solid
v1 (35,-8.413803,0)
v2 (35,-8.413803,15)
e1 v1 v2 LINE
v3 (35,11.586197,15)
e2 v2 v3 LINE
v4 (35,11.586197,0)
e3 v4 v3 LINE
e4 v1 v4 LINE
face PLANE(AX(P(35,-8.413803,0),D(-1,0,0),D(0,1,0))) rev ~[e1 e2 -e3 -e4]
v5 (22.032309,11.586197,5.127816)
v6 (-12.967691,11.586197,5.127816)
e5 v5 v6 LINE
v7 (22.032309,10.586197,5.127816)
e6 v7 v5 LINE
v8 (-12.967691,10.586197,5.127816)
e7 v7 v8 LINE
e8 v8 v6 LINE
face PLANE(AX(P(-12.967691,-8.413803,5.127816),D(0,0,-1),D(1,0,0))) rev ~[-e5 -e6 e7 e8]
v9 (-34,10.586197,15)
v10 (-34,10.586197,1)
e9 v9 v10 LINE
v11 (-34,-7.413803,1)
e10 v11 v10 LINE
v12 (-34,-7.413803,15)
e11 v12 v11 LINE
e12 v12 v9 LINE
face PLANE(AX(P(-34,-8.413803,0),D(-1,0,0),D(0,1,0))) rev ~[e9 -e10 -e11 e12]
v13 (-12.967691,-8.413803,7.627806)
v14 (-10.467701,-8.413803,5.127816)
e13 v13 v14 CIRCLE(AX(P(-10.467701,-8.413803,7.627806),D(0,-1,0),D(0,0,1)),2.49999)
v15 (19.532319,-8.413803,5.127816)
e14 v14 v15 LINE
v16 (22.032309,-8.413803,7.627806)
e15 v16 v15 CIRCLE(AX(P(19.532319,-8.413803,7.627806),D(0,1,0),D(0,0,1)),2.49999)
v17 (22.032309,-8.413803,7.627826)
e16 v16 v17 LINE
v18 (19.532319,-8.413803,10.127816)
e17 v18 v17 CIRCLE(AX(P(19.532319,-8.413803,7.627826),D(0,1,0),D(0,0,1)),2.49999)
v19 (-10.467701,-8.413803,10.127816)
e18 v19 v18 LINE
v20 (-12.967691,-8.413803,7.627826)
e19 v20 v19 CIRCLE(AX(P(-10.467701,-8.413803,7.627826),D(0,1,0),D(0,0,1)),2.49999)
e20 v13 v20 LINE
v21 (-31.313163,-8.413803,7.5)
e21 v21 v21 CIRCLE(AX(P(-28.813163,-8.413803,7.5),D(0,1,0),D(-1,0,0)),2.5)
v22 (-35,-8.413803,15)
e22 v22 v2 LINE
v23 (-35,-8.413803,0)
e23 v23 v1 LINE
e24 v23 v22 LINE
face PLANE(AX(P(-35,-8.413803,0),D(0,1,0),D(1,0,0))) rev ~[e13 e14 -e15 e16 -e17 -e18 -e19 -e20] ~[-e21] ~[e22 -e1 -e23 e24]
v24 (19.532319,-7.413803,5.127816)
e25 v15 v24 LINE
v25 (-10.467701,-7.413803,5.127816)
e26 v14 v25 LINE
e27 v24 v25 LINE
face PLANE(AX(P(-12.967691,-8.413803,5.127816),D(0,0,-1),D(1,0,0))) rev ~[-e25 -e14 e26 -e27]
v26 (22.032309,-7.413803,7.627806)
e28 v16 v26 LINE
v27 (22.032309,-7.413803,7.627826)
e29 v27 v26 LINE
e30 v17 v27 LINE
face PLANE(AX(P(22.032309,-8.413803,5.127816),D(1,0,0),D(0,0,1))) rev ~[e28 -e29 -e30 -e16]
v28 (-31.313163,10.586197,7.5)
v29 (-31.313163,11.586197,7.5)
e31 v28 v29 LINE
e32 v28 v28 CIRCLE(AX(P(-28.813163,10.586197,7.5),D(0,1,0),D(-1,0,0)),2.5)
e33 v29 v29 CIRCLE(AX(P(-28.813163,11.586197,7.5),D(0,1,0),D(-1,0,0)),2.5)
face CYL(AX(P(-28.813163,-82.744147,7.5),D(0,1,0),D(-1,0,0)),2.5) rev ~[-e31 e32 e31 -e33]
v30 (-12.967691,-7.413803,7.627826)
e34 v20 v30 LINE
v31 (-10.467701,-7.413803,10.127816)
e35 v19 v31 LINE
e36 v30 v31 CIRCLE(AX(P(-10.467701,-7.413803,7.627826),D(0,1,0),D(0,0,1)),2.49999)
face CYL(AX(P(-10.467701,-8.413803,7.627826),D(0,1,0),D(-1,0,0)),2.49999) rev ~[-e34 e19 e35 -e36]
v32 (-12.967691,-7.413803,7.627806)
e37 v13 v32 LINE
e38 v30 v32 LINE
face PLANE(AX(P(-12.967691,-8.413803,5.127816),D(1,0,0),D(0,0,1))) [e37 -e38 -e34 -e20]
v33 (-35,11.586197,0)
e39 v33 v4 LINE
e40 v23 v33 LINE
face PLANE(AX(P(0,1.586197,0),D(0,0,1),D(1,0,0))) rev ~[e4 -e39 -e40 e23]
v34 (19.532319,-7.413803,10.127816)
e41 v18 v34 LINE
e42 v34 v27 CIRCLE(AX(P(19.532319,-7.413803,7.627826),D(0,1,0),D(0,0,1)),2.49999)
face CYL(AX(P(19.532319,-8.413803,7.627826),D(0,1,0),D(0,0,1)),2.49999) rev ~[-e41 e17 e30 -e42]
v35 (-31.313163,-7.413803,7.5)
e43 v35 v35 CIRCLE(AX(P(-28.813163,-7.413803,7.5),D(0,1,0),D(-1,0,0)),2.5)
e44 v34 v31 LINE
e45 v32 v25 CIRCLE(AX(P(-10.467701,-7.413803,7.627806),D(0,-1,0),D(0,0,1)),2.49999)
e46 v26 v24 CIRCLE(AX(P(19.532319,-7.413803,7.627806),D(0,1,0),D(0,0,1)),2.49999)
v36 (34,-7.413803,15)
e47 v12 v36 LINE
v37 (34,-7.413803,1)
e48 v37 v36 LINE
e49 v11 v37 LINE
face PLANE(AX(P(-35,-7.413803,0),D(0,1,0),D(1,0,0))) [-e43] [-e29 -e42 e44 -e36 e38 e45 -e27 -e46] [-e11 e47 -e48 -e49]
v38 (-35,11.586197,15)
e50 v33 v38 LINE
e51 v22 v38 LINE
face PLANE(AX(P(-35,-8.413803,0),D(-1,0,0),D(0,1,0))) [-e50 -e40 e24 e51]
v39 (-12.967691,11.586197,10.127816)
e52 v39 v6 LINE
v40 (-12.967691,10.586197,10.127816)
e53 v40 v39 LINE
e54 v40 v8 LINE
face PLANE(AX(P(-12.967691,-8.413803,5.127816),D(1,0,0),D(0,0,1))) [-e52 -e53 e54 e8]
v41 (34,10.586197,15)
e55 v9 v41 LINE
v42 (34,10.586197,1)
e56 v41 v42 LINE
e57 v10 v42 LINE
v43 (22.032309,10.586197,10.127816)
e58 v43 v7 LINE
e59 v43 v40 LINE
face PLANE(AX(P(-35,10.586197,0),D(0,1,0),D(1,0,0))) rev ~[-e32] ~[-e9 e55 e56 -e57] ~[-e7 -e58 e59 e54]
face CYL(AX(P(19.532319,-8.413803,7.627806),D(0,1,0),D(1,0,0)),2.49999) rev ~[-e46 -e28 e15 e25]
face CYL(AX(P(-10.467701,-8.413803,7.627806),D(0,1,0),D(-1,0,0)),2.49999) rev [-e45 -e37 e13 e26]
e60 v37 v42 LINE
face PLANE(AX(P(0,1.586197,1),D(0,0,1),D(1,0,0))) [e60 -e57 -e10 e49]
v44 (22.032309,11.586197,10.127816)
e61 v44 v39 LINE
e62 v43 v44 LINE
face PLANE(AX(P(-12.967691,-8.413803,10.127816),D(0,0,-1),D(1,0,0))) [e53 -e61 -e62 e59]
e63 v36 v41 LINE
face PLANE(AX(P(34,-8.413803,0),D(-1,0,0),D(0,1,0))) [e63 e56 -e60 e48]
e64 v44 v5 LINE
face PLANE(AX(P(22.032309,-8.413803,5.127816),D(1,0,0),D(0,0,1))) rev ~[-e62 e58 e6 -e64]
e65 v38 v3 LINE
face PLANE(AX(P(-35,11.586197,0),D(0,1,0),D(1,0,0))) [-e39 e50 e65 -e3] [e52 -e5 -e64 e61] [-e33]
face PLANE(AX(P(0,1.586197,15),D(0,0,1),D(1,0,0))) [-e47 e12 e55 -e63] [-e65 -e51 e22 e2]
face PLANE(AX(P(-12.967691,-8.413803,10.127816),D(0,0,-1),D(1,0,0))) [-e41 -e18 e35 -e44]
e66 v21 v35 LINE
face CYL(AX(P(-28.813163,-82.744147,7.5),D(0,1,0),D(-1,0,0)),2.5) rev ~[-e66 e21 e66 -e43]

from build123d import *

# Parameters (mm, degrees)
F0_W     = 70
F0_H     = 20
F1_DEPTH = 15
F3_T     = -1
F4_D     = 5
F2_W     = 35
F2_H     = 5
F5_DEPTH = 25
F6_R     = 2.49999


# Not quite as in the source:
# - a fillet or chamfer is up to 0.001 mm smaller than in the source, because OpenCascade refuses the exact size


with BuildPart() as f1:
    # F0 (on Top) → F1 (new body)
    with BuildSketch(Plane.XY):
        with Locations((0, 1.5861968277)):
            Rectangle(F0_W, F0_H)
    extrude(amount=F1_DEPTH)

    # F3
    f3_openings = [f1.faces().sort_by_distance(p)[0] for p in [
        (0, 1.586197, 15),
    ]]
    offset(amount=F3_T, openings=f3_openings)

    # F4 (through all)
    with Locations(Plane.XZ.offset(8.4138031723)):
        with Locations((-28.8131628186, 7.5)):
            Hole(F4_D / 2)

    # F2 (on face) → F5 (cut)
    with BuildSketch(Plane.XZ.offset(8.4138031723)):
        with Locations((4.5323091745, 7.627816461)):
            Rectangle(F2_W, F2_H)
    extrude(amount=-F5_DEPTH, mode=Mode.SUBTRACT)

    # F6 (radius 2.5 in the source; OpenCascade refuses exactly that, so slightly less here)
    f6_edges = [f1.edges().sort_by_distance(p)[0] for p in [
        (-12.967691, -7.913803, 10.127816),
        (-12.967691, -7.913803, 5.127816),
        (22.032309, -7.913803, 5.127816),
        (22.032309, -7.913803, 10.127816),
    ]]
    fillet(f6_edges, radius=F6_R)


solid = f1.part
